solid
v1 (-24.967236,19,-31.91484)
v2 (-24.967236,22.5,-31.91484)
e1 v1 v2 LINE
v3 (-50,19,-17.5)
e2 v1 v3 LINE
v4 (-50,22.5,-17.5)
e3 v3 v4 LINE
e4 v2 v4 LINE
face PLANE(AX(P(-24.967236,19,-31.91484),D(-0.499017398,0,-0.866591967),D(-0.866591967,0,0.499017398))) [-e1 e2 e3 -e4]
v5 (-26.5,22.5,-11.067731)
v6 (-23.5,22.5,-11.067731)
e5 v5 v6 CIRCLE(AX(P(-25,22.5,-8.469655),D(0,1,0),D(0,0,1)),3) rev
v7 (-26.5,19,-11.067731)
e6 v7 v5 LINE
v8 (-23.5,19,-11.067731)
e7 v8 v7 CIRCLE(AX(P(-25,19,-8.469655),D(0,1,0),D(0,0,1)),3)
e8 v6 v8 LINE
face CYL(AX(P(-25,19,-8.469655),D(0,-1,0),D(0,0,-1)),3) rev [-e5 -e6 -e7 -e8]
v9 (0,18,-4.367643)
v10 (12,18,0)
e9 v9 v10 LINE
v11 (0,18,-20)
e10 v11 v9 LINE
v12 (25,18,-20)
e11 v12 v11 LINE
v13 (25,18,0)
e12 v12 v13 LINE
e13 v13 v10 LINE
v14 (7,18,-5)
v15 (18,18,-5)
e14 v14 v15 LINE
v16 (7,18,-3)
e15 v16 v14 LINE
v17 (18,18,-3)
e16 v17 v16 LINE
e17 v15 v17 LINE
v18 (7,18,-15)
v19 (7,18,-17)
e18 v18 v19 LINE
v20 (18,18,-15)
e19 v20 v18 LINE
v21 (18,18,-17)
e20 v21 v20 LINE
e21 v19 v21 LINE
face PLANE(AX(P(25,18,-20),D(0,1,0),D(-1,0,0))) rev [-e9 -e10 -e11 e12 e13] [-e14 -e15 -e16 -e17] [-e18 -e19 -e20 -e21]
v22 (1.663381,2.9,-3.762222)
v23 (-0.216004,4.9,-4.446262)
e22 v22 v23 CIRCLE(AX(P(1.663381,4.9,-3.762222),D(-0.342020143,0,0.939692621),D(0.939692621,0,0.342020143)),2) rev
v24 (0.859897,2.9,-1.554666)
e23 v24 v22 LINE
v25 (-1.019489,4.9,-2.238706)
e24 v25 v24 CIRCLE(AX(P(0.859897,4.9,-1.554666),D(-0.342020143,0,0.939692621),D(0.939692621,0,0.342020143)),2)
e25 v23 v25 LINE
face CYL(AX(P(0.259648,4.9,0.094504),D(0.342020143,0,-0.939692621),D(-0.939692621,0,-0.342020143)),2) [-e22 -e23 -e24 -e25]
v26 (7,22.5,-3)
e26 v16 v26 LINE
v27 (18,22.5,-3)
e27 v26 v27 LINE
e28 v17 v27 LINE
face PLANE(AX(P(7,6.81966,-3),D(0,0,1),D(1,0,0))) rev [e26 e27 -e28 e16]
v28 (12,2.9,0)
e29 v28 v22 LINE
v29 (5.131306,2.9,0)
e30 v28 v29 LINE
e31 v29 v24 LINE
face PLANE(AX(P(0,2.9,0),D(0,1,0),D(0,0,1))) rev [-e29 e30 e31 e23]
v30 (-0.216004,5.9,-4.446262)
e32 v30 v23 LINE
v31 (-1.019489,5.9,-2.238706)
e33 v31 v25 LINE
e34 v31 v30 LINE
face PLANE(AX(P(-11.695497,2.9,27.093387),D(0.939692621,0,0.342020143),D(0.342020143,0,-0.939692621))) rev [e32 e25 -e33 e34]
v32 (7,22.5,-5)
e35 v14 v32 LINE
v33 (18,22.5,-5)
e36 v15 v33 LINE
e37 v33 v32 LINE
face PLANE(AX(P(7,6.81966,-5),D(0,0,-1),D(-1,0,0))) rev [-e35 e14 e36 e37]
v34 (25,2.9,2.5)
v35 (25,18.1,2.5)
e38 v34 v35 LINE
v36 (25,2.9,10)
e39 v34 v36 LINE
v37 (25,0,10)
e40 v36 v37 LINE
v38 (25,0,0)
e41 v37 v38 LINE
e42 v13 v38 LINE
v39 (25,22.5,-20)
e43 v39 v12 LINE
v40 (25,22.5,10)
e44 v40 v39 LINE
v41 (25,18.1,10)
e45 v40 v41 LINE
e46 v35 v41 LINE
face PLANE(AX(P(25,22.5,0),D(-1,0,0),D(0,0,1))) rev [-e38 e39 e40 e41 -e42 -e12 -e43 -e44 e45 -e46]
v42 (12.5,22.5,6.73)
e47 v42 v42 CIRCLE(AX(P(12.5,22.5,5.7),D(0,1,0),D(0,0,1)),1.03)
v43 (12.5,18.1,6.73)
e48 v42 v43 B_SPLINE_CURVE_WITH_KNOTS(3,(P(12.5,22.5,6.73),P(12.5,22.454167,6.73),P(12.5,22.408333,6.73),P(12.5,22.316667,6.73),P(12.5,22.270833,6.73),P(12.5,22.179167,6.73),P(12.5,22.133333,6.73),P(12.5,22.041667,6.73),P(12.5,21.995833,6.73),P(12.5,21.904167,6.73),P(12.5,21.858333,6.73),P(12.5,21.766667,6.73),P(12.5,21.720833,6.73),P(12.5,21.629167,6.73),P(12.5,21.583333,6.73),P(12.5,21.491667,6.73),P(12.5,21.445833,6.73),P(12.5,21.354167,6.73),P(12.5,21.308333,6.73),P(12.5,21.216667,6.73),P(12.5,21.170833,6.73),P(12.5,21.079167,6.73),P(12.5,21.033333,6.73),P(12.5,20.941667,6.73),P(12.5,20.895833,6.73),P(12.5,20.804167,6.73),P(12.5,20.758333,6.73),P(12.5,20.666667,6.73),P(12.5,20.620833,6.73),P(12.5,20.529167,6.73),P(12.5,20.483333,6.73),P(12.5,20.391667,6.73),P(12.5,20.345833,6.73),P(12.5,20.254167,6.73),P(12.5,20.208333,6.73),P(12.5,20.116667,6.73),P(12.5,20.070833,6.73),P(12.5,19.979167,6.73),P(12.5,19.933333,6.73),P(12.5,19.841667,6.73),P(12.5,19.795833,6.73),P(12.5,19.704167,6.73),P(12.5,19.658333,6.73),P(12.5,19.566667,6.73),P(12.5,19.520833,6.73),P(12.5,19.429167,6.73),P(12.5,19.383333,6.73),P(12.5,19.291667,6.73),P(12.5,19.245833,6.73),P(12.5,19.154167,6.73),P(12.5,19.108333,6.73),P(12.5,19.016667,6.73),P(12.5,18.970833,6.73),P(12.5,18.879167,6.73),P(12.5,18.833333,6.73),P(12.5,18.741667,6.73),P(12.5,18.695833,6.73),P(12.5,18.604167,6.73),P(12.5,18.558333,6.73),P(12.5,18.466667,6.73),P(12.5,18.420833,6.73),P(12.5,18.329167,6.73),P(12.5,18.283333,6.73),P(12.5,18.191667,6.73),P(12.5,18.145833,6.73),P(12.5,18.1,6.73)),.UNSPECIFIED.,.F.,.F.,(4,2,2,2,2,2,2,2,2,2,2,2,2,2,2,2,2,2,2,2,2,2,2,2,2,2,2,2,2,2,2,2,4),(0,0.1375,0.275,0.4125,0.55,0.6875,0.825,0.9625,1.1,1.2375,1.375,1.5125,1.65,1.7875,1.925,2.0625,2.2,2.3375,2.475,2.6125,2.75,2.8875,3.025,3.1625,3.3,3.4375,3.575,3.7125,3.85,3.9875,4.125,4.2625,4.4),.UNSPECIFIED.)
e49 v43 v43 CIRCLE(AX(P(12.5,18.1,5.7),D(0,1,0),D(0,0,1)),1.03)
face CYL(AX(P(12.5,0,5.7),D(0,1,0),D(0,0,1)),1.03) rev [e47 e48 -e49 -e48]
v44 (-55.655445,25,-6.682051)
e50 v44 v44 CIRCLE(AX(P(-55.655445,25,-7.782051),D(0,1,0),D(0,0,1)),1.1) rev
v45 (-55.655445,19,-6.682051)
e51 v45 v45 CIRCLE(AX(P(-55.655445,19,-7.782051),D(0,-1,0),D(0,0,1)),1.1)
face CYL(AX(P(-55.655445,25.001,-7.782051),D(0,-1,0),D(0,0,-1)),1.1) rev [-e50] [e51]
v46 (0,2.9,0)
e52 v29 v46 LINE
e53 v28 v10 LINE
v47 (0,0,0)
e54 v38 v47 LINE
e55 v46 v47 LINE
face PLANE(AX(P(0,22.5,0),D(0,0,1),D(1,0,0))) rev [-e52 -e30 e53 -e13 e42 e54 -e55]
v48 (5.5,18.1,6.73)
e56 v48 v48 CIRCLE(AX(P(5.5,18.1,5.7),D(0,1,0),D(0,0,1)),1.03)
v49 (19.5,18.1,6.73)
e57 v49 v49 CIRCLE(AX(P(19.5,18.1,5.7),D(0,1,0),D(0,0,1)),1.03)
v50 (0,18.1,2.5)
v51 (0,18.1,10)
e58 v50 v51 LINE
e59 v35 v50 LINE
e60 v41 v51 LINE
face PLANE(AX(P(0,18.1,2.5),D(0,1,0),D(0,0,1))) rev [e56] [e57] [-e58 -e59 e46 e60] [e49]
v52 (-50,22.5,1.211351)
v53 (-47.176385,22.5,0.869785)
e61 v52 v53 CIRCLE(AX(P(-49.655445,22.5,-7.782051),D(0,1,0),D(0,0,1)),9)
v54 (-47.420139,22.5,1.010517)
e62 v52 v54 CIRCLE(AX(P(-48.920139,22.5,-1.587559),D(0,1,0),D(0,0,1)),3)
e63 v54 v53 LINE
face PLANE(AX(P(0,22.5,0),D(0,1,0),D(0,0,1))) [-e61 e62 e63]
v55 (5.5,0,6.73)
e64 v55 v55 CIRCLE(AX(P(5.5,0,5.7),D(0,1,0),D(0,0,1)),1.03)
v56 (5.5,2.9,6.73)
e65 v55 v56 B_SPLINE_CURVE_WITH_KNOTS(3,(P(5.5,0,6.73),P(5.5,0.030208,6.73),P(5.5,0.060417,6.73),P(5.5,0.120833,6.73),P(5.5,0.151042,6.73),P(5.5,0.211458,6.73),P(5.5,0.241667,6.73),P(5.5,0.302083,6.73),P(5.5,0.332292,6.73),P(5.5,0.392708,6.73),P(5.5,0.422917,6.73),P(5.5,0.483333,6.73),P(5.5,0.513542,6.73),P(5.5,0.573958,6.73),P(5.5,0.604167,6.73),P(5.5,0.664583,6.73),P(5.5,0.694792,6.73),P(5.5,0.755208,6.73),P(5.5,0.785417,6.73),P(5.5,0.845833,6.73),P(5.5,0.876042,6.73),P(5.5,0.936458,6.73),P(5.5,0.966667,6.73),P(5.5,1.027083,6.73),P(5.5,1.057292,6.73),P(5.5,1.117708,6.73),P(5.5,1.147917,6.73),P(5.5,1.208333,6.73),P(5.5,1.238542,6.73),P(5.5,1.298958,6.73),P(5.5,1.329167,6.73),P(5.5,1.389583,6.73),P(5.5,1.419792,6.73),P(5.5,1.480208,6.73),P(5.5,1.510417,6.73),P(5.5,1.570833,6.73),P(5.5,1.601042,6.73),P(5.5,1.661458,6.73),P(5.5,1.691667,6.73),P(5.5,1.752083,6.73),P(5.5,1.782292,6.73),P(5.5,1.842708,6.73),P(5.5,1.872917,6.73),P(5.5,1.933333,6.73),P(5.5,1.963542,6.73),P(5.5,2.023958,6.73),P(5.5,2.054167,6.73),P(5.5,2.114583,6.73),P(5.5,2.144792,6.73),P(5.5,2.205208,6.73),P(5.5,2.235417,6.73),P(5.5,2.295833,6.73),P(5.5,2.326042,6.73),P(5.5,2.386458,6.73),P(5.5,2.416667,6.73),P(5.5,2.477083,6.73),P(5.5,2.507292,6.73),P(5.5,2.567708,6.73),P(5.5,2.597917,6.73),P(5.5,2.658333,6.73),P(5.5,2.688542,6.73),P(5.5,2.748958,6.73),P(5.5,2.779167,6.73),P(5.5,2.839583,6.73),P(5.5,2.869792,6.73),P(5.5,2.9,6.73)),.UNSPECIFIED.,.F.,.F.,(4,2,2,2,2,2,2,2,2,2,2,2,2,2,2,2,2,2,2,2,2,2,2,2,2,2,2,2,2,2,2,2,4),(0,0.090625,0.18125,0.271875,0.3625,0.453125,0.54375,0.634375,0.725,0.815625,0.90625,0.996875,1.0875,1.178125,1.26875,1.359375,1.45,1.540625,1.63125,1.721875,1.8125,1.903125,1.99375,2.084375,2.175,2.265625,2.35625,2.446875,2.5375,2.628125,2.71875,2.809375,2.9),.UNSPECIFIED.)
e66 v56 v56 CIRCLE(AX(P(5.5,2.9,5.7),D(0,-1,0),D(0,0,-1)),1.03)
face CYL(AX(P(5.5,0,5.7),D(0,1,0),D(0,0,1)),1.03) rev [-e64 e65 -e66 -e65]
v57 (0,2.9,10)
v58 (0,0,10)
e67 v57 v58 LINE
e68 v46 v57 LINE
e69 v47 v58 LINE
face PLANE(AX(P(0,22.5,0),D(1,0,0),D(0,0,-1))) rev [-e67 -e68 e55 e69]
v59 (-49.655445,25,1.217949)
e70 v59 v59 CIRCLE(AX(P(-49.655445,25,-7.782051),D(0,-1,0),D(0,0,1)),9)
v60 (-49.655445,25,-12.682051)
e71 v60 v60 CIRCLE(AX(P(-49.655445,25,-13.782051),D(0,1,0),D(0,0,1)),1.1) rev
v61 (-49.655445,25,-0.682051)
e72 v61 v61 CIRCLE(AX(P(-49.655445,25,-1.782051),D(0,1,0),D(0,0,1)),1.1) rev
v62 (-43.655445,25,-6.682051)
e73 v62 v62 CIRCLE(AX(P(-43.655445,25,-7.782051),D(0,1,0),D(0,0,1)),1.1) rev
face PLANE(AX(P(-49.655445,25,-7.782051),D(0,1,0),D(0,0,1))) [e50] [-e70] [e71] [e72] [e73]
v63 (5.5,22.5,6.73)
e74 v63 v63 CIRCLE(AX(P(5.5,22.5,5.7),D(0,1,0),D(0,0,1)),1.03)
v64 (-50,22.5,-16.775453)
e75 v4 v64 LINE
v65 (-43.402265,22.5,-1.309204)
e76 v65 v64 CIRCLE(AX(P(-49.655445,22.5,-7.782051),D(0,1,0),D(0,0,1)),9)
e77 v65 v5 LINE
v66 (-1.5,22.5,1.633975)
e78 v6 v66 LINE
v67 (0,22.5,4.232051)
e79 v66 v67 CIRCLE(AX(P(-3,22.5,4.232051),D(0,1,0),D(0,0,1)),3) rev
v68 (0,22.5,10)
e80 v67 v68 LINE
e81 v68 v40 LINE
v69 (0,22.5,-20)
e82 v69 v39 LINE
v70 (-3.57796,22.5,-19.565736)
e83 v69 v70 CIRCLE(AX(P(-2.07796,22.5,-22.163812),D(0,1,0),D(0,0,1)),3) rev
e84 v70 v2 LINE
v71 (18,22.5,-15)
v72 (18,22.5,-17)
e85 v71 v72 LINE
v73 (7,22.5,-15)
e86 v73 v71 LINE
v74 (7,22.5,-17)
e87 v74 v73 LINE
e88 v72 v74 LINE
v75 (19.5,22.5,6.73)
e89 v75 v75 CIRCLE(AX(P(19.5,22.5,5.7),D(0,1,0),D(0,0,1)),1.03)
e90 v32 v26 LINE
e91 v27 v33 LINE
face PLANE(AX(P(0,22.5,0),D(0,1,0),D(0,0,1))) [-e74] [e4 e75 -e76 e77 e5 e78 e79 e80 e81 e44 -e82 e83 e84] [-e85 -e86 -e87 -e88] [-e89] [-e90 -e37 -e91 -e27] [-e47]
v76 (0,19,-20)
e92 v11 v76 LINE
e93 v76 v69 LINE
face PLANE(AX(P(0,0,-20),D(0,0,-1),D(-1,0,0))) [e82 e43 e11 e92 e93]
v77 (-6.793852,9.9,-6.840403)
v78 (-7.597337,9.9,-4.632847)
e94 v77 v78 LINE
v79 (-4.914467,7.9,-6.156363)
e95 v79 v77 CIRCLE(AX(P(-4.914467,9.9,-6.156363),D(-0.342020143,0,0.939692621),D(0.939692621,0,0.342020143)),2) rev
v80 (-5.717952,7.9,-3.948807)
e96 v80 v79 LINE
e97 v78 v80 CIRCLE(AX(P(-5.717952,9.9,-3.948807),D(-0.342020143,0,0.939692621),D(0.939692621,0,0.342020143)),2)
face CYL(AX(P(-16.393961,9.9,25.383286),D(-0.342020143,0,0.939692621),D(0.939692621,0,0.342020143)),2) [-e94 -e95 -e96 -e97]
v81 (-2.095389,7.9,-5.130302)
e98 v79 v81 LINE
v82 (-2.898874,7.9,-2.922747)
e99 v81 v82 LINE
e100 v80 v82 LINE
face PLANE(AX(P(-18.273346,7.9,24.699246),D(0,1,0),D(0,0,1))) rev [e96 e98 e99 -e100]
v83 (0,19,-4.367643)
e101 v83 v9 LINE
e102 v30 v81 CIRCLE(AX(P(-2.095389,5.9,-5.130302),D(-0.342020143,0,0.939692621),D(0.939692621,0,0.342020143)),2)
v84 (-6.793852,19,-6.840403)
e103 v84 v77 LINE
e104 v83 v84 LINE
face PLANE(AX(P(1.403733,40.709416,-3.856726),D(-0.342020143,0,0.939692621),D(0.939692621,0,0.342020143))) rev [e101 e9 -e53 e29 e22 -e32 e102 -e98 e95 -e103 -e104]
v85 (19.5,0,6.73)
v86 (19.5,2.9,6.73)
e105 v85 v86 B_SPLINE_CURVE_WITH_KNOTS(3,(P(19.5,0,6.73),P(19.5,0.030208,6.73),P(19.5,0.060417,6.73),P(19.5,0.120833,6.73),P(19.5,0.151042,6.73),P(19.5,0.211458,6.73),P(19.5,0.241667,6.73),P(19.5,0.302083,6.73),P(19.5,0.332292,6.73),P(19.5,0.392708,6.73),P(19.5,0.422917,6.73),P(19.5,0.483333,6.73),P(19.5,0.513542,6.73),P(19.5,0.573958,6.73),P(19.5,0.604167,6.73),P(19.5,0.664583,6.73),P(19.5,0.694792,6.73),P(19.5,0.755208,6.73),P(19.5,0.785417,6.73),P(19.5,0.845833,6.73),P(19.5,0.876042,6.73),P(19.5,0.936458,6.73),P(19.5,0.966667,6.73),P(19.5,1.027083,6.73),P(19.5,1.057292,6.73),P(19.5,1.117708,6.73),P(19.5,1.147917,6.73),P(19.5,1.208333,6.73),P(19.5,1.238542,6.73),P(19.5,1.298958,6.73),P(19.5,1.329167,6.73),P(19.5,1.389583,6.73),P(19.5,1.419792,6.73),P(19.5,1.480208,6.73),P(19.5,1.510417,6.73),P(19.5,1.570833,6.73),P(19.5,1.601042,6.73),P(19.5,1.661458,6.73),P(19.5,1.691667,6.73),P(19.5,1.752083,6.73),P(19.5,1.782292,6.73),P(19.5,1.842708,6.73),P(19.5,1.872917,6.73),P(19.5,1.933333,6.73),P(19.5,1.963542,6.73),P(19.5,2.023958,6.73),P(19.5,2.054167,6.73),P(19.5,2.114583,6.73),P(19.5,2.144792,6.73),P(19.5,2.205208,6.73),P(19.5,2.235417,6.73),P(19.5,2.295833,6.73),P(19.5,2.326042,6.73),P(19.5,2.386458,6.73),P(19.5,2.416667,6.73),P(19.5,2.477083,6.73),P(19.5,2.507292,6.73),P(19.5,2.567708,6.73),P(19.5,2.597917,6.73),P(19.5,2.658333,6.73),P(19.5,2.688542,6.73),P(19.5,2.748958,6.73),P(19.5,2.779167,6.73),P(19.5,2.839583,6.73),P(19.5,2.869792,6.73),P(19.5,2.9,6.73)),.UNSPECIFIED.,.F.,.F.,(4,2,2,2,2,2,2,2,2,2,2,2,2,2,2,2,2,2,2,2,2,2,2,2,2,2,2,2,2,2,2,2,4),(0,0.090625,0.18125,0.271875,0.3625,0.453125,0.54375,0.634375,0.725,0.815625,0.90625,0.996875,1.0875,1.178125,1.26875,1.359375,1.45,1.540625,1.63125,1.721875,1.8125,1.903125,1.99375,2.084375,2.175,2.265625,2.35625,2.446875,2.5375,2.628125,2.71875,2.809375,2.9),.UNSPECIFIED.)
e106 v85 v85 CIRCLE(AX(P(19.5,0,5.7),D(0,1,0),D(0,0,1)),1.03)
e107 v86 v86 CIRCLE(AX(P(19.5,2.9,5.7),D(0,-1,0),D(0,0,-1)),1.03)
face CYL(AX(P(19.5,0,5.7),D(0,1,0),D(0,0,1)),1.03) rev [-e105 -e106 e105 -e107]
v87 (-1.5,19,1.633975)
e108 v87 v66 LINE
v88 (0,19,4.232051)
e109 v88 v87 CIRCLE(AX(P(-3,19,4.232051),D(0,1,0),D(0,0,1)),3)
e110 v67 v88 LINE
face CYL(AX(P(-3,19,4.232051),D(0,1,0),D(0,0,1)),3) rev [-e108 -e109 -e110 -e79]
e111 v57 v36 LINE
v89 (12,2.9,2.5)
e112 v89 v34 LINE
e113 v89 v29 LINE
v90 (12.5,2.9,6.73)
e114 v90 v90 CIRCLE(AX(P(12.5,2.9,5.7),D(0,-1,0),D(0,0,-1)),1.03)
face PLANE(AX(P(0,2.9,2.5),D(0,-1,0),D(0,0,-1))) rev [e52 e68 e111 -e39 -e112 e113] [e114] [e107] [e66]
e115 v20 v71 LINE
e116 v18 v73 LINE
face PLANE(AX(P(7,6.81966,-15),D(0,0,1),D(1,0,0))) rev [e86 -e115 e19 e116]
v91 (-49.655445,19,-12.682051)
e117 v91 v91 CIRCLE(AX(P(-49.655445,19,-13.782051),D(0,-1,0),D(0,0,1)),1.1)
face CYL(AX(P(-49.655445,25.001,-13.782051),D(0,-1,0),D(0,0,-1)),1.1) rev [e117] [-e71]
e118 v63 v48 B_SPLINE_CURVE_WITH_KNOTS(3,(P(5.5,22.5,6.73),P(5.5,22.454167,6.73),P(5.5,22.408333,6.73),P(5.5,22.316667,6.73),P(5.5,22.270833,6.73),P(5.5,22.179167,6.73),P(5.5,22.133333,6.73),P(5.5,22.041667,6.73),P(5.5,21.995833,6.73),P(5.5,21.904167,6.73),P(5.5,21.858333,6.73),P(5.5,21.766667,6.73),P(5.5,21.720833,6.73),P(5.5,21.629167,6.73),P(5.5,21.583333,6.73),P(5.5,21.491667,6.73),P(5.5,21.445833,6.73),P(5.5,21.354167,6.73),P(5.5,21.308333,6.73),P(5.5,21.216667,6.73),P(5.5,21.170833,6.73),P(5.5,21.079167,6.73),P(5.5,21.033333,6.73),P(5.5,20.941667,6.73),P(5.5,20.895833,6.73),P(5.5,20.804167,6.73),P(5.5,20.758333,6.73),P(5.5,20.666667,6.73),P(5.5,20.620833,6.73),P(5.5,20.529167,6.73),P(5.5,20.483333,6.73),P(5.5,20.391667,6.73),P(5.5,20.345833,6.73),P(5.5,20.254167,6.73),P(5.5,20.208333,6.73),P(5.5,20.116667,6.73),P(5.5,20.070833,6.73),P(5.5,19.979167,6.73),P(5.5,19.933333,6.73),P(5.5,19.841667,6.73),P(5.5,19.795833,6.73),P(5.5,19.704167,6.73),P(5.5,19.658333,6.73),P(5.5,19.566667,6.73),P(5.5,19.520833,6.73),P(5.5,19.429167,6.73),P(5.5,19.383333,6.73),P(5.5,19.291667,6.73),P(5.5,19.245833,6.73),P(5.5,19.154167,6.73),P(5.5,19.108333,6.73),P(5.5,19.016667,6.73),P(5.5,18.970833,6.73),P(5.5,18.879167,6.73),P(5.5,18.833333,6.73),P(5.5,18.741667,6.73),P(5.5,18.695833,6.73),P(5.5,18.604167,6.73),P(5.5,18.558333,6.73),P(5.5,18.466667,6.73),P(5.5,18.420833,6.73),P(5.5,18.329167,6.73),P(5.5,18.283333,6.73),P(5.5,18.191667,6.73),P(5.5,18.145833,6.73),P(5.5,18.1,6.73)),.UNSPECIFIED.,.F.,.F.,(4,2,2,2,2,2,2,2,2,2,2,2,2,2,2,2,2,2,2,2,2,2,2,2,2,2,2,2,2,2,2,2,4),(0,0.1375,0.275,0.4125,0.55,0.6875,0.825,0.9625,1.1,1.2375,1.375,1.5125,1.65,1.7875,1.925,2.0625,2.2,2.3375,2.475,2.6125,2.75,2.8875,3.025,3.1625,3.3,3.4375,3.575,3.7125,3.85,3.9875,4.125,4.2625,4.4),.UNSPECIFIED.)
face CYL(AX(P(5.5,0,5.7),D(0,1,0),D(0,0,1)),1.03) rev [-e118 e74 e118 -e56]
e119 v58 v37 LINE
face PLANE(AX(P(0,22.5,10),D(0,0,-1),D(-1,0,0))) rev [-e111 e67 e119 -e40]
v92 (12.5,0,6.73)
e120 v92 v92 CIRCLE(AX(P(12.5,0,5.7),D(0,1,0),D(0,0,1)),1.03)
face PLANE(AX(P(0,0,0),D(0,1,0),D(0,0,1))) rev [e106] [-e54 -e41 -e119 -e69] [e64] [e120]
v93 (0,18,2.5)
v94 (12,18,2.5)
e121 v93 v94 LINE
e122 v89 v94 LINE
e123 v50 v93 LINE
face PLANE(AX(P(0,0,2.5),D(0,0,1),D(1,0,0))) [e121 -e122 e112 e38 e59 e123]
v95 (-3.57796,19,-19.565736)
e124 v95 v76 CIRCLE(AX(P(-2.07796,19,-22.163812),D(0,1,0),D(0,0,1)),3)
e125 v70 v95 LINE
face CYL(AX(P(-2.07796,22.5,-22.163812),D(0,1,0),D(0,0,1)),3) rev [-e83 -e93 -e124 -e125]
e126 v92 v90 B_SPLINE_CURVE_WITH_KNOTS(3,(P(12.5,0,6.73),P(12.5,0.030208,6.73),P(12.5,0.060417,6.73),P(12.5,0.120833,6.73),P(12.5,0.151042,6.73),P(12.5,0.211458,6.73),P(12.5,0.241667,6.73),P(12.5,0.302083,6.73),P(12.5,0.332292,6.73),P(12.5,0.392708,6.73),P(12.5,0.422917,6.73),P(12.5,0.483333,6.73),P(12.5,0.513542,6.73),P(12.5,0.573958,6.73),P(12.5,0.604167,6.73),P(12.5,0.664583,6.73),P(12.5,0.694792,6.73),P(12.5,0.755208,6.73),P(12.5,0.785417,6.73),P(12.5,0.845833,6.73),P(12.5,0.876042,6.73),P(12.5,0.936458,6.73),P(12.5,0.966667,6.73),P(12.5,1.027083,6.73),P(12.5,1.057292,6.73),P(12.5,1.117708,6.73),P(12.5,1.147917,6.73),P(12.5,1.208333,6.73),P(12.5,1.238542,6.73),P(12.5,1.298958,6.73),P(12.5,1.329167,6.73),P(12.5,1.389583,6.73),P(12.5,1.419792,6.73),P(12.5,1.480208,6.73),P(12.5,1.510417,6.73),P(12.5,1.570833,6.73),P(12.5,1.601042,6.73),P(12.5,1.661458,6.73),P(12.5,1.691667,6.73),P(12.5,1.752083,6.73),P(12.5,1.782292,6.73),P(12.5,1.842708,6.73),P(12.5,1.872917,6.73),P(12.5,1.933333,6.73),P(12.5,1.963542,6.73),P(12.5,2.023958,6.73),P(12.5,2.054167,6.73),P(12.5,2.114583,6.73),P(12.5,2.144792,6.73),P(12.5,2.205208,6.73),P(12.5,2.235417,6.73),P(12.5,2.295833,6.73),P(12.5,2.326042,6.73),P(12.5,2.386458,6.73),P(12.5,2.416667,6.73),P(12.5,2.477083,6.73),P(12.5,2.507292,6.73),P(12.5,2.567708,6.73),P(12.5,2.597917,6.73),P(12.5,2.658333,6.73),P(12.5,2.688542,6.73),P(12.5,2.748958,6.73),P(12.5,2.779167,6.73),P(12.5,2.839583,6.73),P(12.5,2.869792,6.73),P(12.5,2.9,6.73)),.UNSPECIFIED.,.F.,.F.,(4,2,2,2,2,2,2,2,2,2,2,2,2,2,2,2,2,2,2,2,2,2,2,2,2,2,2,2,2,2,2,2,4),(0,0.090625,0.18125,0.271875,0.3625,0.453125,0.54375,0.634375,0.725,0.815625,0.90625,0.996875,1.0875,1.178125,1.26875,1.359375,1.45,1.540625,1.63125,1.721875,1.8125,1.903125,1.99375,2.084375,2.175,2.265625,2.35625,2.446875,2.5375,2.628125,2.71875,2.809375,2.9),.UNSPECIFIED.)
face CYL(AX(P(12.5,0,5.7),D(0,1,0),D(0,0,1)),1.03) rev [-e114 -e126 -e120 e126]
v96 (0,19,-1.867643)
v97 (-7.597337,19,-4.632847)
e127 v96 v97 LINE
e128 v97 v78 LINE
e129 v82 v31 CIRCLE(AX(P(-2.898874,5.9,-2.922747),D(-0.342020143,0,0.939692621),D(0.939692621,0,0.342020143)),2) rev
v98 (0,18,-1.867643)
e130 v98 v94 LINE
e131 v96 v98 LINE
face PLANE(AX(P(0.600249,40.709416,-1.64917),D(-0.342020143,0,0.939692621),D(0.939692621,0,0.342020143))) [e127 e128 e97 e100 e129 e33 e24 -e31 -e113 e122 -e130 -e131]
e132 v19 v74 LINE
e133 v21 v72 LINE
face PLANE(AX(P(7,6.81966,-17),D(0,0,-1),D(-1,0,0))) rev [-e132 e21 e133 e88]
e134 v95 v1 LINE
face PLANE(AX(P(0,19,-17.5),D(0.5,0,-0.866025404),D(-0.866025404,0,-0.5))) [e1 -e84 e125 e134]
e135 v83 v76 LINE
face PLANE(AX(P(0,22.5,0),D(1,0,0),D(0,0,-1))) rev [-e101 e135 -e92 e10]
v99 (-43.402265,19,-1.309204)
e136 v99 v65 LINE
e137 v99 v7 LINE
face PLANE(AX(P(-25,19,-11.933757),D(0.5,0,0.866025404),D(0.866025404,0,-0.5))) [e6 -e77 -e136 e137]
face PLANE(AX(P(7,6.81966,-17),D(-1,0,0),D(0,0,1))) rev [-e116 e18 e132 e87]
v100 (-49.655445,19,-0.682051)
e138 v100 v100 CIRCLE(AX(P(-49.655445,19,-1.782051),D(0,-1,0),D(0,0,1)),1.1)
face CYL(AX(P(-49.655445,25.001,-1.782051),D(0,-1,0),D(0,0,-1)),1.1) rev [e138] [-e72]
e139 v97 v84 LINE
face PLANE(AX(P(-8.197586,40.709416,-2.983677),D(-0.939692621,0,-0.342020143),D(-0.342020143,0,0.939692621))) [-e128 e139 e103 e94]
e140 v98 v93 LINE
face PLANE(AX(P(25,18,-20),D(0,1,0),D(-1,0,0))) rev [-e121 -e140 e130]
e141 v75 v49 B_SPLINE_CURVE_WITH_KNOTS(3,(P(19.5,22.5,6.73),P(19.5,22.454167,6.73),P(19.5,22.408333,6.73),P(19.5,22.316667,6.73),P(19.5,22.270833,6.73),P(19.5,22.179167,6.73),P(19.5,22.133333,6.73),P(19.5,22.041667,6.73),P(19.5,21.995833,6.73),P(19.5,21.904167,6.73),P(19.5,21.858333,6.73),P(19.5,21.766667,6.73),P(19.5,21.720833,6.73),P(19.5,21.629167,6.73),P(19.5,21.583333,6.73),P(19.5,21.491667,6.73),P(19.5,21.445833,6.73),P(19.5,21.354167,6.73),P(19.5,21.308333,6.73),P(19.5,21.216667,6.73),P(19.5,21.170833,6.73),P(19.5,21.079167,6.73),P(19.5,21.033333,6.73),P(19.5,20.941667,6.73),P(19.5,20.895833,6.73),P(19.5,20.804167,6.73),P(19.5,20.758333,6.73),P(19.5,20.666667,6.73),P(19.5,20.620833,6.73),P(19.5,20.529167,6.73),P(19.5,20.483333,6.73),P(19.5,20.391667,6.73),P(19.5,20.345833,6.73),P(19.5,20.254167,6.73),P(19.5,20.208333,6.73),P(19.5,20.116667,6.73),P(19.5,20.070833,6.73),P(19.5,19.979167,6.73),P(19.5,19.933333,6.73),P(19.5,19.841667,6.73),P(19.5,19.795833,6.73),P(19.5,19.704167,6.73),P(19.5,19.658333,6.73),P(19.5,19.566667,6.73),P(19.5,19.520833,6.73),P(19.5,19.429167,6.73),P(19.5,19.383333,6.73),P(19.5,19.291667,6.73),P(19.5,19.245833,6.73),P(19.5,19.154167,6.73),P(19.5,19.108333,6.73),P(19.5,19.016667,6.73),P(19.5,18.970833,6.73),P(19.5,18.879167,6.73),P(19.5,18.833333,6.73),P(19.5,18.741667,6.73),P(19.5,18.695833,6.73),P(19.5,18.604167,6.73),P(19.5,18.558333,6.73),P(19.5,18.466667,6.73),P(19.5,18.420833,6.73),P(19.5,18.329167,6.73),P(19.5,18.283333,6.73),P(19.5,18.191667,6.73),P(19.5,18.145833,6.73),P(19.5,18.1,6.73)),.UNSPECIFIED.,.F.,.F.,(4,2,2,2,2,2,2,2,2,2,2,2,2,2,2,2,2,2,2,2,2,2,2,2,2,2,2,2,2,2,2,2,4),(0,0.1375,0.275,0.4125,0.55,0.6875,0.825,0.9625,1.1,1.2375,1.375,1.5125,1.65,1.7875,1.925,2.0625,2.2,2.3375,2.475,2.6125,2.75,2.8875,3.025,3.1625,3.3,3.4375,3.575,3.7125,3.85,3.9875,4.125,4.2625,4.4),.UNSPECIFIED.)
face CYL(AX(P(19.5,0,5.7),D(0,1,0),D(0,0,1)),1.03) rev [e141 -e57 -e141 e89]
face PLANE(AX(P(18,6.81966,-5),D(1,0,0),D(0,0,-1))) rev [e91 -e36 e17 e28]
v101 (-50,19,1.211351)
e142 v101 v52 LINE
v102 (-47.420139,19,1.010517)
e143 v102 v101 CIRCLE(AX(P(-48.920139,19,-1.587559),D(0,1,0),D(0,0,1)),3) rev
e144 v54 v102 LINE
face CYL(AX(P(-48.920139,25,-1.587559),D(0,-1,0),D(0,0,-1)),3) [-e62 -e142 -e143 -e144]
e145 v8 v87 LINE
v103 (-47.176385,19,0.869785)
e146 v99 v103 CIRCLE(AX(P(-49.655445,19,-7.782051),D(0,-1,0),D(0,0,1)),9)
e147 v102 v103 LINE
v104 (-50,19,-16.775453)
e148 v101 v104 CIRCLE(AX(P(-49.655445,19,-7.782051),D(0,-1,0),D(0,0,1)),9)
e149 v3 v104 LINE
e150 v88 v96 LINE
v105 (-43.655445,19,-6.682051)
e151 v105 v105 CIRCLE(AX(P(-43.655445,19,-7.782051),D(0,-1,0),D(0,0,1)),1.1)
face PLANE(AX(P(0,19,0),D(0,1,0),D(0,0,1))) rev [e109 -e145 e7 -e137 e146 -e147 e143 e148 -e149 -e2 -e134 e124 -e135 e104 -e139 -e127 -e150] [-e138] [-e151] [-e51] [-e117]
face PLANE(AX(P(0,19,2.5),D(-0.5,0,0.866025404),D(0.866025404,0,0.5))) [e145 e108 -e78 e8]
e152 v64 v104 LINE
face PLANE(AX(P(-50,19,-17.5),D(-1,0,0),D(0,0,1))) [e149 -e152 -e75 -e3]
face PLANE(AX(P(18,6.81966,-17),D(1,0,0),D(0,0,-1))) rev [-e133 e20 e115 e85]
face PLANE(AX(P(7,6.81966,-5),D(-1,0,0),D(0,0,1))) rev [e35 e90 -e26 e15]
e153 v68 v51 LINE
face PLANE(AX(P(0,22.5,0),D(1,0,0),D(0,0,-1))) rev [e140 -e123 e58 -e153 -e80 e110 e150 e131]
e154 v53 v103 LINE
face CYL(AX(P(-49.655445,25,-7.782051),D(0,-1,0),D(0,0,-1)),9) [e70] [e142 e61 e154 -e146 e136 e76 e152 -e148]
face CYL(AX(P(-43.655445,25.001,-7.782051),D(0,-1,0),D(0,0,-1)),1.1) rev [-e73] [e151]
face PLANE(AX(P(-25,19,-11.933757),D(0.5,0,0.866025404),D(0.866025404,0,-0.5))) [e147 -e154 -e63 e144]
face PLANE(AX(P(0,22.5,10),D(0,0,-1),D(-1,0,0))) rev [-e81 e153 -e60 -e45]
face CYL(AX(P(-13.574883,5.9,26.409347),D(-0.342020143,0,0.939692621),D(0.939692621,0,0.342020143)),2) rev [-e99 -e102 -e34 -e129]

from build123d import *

# Parameters (mm, degrees)
SKETCH_1_W               = 25
SKETCH_1_H               = 10
EXTRUDE_1_DEPTH          = 22.5
SKETCH_2_W               = 25
SKETCH_2_H               = 15.2
CUT_EXTRUDE_1_DEPTH      = 7.5
CUT_EXTRUDE_2_DEPTH      = 36.089172119
CUT_EXTRUDE_2_DEPTH_BACK = 36.089172119
SKETCH_4_R               = 1.03
SKETCH_5_W               = 25
SKETCH_5_H               = 4.5
EXTRUDE_2_DEPTH          = 20
SKETCH_6_W               = 11
SKETCH_6_H               = 2
CUT_EXTRUDE_3_DEPTH      = 4.5
EXTRUDE_3_DEPTH          = 3.5
SKETCH_16_R              = 9
EXTRUDE_4_DEPTH          = 6
CUT_EXTRUDE_4_REACH      = 71.426
SKETCH_17_R              = 1.1
CUT_EXTRUDE_5_REACH      = 73.302
SKETCH_19_W              = 12
SKETCH_19_H              = 15.1
FILLET_7_R               = 3
EXTRUDE_6_REACH          = 72.338
CUT_EXTRUDE_6_REACH      = 72.847
SKETCH_22_W              = 7
SKETCH_22_H              = 5
FILLET_8_R               = 2


with BuildPart() as part:
    # 草图1 → 凸台-拉伸1 (new body)
    with BuildSketch(Plane(origin=(0, 0, 0), x_dir=(1, 0, 0), z_dir=(0, 1, 0))):
        with Locations((12.5, -5)):
            Rectangle(SKETCH_1_W, SKETCH_1_H)
    extrude(amount=EXTRUDE_1_DEPTH)

    # 草图2 → 切除-拉伸1 (cut)
    with BuildSketch(Plane.XY.offset(10)):
        with Locations((12.5, 10.5)):
            Rectangle(SKETCH_2_W, SKETCH_2_H)
    extrude(amount=-CUT_EXTRUDE_1_DEPTH, mode=Mode.SUBTRACT)

    # 草图4 → 切除-拉伸2 (cut, two sides: drawn at the far end of the back side and taken through both)
    with BuildSketch(Plane(origin=(0, 22.5, 0), x_dir=(1, 0, 0), z_dir=(0, 1, 0)).offset(-CUT_EXTRUDE_2_DEPTH_BACK)):
        with Locations(Location((12.5, -5.7, 0), (0, 0, 270))):
            Circle(SKETCH_4_R)
        with Locations(Location((19.5, -5.7, 0), (0, 0, 270))):
            Circle(SKETCH_4_R)
        with Locations(Location((5.5, -5.7, 0), (0, 0, 270))):
            Circle(SKETCH_4_R)
    extrude(amount=CUT_EXTRUDE_2_DEPTH + CUT_EXTRUDE_2_DEPTH_BACK, mode=Mode.SUBTRACT)

    # 草图5 → 凸台-拉伸2 (add)
    with BuildSketch(Plane(origin=(0, 0, 0), x_dir=(-1, 0, 0), z_dir=(0, 0, -1))):
        with Locations((-12.5, 20.25)):
            Rectangle(SKETCH_5_W, SKETCH_5_H)
    extrude(amount=EXTRUDE_2_DEPTH)

    # 草图6 → 切除-拉伸3 (cut)
    with BuildSketch(Plane(origin=(0, 22.5, 0), x_dir=(1, 0, 0), z_dir=(0, 1, 0))):
        with Locations((12.5, 16)):
            Rectangle(SKETCH_6_W, SKETCH_6_H)
        with Locations((12.5, 4)):
            Rectangle(SKETCH_6_W, SKETCH_6_H)
    extrude(amount=-CUT_EXTRUDE_3_DEPTH, mode=Mode.SUBTRACT)

    # 草图15 → 凸台-拉伸3 (add)
    with BuildSketch(Plane(origin=(0, 22.5, 0), x_dir=(1, 0, 0), z_dir=(0, 1, 0))):
        Polygon((0, 17.5), (0, -2.5), (-25, 11.93375673), (-50, -2.5), (-50, 17.5), (-24.967235844, 31.914840335), align=None)
    extrude(amount=-EXTRUDE_3_DEPTH)

    # 草图16 → 凸台-拉伸4 (add)
    with BuildSketch(Plane.XZ.offset(-19)):
        with Locations(Location((-49.655444566, -7.782050808, 0), (0, 0, 267.805955804))):
            Circle(SKETCH_16_R)
    extrude(amount=-EXTRUDE_4_DEPTH)

    # 草图17 → 切除-拉伸4 (cut, up to next)
    with BuildSketch(Plane.XZ.offset(-19), mode=Mode.PRIVATE) as cut_extrude_4_sk1:
        with Locations(Location((-55.655444566, -7.782050808, 0), (0, 0, 90))):
            Circle(SKETCH_17_R)
    cut_extrude_4_tool1 = extrude(cut_extrude_4_sk1.sketch, amount=-CUT_EXTRUDE_4_REACH, mode=Mode.PRIVATE) & part.part
    # 草图17 → 切除-拉伸4 (cut, up to next)
    with BuildSketch(Plane.XZ.offset(-19), mode=Mode.PRIVATE) as cut_extrude_4_sk2:
        with Locations(Location((-43.655444566, -7.782050808, 0), (0, 0, 90))):
            Circle(SKETCH_17_R)
    cut_extrude_4_tool2 = extrude(cut_extrude_4_sk2.sketch, amount=-CUT_EXTRUDE_4_REACH, mode=Mode.PRIVATE) & part.part
    # 草图17 → 切除-拉伸4 (cut, up to next)
    with BuildSketch(Plane.XZ.offset(-19), mode=Mode.PRIVATE) as cut_extrude_4_sk3:
        with Locations(Location((-49.655444566, -1.782050808, 0), (0, 0, 90))):
            Circle(SKETCH_17_R)
    cut_extrude_4_tool3 = extrude(cut_extrude_4_sk3.sketch, amount=-CUT_EXTRUDE_4_REACH, mode=Mode.PRIVATE) & part.part
    # 草图17 → 切除-拉伸4 (cut, up to next)
    with BuildSketch(Plane.XZ.offset(-19), mode=Mode.PRIVATE) as cut_extrude_4_sk4:
        with Locations(Location((-49.655444566, -13.782050808, 0), (0, 0, 90))):
            Circle(SKETCH_17_R)
    cut_extrude_4_tool4 = extrude(cut_extrude_4_sk4.sketch, amount=-CUT_EXTRUDE_4_REACH, mode=Mode.PRIVATE) & part.part
    add(cut_extrude_4_tool1.solids().sort_by_distance((-55.655445, 19, -7.782051))[0], mode=Mode.SUBTRACT)
    add(cut_extrude_4_tool2.solids().sort_by_distance((-43.655445, 19, -7.782051))[0], mode=Mode.SUBTRACT)
    add(cut_extrude_4_tool3.solids().sort_by_distance((-49.655445, 19, -1.782051))[0], mode=Mode.SUBTRACT)
    add(cut_extrude_4_tool4.solids().sort_by_distance((-49.655445, 19, -13.782051))[0], mode=Mode.SUBTRACT)

    # 草图19 → 切除-拉伸5 (cut, up to next)
    with BuildSketch(Plane(origin=(0, 0, 0), x_dir=(-1, 0, 0), z_dir=(0, 0, -1)), mode=Mode.PRIVATE) as cut_extrude_5_sk1:
        with Locations((-6, 10.45)):
            Rectangle(SKETCH_19_W, SKETCH_19_H)
    cut_extrude_5_tool1 = extrude(cut_extrude_5_sk1.sketch, amount=-CUT_EXTRUDE_5_REACH, mode=Mode.PRIVATE) & part.part
    add(cut_extrude_5_tool1.solids().sort_by_distance((6, 10.45, 0))[0], mode=Mode.SUBTRACT)

    # 圆角7
    # the kernel refuses this fillet: 3 mm, written as the material it adds along each edge
    with BuildSketch(Plane(origin=(0, 22.5, -17.5), x_dir=(-0.866025403784437, 0, -0.5000000000000027), z_dir=(0, -1, 0))) as fillet_7_piece_1:
        with BuildLine():
            CenterArc((4.131472029, 3), FILLET_7_R, 196.159495152, 73.840504848)
            Line((1.25, 2.165063509), (0, 0))
            Line((0, 0), (4.131472029, 0))
        make_face()
    extrude(amount=3.5)
    with BuildSketch(Plane(origin=(0, 22.5, 2.5), x_dir=(-0.8660254037844379, 0, -0.5000000000000012), z_dir=(0, -1, 0))) as fillet_7_piece_2:
        with BuildLine():
            CenterArc((FILLET_7_R * 0.57735026919, -FILLET_7_R), FILLET_7_R, 90, 60)
            Line((-FILLET_7_R * 0.288675134595, -FILLET_7_R * 0.5), (0, 0))
            Line((0, 0), (FILLET_7_R * 0.57735026919, 0))
        make_face()
    extrude(amount=3.5)
    with BuildSketch(Plane(origin=(-25, 22.5, -11.93375673), x_dir=(0.8660254037844384, 0, 0.5000000000000003), z_dir=(0, -1, 0))) as fillet_7_piece_3:
        with BuildLine():
            CenterArc((FILLET_7_R * 0.57735026919, FILLET_7_R), FILLET_7_R, 210, 60)
            Line((-FILLET_7_R * 0.288675134595, FILLET_7_R * 0.5), (0, 0))
            Line((0, 0), (FILLET_7_R * 0.57735026919, 0))
        make_face()
    extrude(amount=3.5)
    # the kernel refuses this fillet: 3 mm, written as the material it takes off along each edge
    with BuildSketch(Plane(origin=(-50, 29.947415965, 2.5), x_dir=(0, 0, -1), z_dir=(0, -1, 0))) as fillet_7_2_piece_1:
        with BuildLine():
            CenterArc((4.087559404, 1.079860567), FILLET_7_R, 150, 51.097341704)
            Line((1.489483193, 2.579860567), (0, 0))
            Line((0, 0), (1.288648696, 0))
        make_face()
    extrude(amount=18.394831929, mode=Mode.SUBTRACT)

    # 凸台-拉伸6: up to this face of the body (flat: up to its plane)
    extrude_6_end = Plane(part.part.faces().sort_by_distance((-27.69980279, 19, -14.058564272))[0])
    # 草图21 → 凸台-拉伸6 (add, up to the picked face)
    with BuildSketch(Plane(origin=(0, 2.9, 0), x_dir=(1, 0, 0), z_dir=(0, 1, 0)), mode=Mode.PRIVATE) as extrude_6_sk1:
        Polygon((5.131306451, 0), (12, 0), (-6.793852416, 6.840402867), (-7.597336928, 4.632847313), align=None)
    extrude_6_tool1 = split(extrude(extrude_6_sk1.sketch, amount=EXTRUDE_6_REACH, mode=Mode.PRIVATE), bisect_by=extrude_6_end, keep=Keep.BOTH, mode=Mode.PRIVATE)
    # 草图21 → 凸台-拉伸6 (add, up to the picked face)
    with BuildSketch(Plane(origin=(0, 2.9, 0), x_dir=(1, 0, 0), z_dir=(0, 1, 0)), mode=Mode.PRIVATE) as extrude_6_sk2:
        Polygon((5.131306451, 0), (12, -2.5), (12, 0), align=None)
    extrude_6_tool2 = split(extrude(extrude_6_sk2.sketch, amount=EXTRUDE_6_REACH, mode=Mode.PRIVATE), bisect_by=extrude_6_end, keep=Keep.BOTH, mode=Mode.PRIVATE)
    add(extrude_6_tool1.solids().sort_by(Axis((0.808046, 2.9, -2.903709), (0, 1, 0)))[0])
    add(extrude_6_tool2.solids().sort_by(Axis((9.710435, 2.9, 0.833333), (0, 1, 0)))[0])

    # 草图22 → 切除-拉伸6 (cut, up to next)
    with BuildSketch(Plane(origin=(1.403733341, 0, -3.856725658), x_dir=(-0.9396926207859082, 0, -0.3420201433256691), z_dir=(0.3420201433256691, 0, -0.9396926207859082)), mode=Mode.PRIVATE) as cut_extrude_6_sk1:
        with Locations((5.223688551, 5.4)):
            Rectangle(SKETCH_22_W, SKETCH_22_H)
    cut_extrude_6_tool1 = extrude(cut_extrude_6_sk1.sketch, amount=-CUT_EXTRUDE_6_REACH, mode=Mode.PRIVATE) & part.part
    add(cut_extrude_6_tool1.solids().sort_by_distance((-3.504928, 5.4, -5.643332))[0], mode=Mode.SUBTRACT)

    # 圆角8
    fillet_8_edges = [part.edges().sort_by_distance(p)[0] for p in [
        (-7.195594672, 7.9, -5.73662509),
        (-0.617746326, 2.9, -3.342484086),
        (-0.617746326, 7.9, -3.342484086),
    ]]
    fillet(fillet_8_edges, radius=FILLET_8_R)


solid = part.part
